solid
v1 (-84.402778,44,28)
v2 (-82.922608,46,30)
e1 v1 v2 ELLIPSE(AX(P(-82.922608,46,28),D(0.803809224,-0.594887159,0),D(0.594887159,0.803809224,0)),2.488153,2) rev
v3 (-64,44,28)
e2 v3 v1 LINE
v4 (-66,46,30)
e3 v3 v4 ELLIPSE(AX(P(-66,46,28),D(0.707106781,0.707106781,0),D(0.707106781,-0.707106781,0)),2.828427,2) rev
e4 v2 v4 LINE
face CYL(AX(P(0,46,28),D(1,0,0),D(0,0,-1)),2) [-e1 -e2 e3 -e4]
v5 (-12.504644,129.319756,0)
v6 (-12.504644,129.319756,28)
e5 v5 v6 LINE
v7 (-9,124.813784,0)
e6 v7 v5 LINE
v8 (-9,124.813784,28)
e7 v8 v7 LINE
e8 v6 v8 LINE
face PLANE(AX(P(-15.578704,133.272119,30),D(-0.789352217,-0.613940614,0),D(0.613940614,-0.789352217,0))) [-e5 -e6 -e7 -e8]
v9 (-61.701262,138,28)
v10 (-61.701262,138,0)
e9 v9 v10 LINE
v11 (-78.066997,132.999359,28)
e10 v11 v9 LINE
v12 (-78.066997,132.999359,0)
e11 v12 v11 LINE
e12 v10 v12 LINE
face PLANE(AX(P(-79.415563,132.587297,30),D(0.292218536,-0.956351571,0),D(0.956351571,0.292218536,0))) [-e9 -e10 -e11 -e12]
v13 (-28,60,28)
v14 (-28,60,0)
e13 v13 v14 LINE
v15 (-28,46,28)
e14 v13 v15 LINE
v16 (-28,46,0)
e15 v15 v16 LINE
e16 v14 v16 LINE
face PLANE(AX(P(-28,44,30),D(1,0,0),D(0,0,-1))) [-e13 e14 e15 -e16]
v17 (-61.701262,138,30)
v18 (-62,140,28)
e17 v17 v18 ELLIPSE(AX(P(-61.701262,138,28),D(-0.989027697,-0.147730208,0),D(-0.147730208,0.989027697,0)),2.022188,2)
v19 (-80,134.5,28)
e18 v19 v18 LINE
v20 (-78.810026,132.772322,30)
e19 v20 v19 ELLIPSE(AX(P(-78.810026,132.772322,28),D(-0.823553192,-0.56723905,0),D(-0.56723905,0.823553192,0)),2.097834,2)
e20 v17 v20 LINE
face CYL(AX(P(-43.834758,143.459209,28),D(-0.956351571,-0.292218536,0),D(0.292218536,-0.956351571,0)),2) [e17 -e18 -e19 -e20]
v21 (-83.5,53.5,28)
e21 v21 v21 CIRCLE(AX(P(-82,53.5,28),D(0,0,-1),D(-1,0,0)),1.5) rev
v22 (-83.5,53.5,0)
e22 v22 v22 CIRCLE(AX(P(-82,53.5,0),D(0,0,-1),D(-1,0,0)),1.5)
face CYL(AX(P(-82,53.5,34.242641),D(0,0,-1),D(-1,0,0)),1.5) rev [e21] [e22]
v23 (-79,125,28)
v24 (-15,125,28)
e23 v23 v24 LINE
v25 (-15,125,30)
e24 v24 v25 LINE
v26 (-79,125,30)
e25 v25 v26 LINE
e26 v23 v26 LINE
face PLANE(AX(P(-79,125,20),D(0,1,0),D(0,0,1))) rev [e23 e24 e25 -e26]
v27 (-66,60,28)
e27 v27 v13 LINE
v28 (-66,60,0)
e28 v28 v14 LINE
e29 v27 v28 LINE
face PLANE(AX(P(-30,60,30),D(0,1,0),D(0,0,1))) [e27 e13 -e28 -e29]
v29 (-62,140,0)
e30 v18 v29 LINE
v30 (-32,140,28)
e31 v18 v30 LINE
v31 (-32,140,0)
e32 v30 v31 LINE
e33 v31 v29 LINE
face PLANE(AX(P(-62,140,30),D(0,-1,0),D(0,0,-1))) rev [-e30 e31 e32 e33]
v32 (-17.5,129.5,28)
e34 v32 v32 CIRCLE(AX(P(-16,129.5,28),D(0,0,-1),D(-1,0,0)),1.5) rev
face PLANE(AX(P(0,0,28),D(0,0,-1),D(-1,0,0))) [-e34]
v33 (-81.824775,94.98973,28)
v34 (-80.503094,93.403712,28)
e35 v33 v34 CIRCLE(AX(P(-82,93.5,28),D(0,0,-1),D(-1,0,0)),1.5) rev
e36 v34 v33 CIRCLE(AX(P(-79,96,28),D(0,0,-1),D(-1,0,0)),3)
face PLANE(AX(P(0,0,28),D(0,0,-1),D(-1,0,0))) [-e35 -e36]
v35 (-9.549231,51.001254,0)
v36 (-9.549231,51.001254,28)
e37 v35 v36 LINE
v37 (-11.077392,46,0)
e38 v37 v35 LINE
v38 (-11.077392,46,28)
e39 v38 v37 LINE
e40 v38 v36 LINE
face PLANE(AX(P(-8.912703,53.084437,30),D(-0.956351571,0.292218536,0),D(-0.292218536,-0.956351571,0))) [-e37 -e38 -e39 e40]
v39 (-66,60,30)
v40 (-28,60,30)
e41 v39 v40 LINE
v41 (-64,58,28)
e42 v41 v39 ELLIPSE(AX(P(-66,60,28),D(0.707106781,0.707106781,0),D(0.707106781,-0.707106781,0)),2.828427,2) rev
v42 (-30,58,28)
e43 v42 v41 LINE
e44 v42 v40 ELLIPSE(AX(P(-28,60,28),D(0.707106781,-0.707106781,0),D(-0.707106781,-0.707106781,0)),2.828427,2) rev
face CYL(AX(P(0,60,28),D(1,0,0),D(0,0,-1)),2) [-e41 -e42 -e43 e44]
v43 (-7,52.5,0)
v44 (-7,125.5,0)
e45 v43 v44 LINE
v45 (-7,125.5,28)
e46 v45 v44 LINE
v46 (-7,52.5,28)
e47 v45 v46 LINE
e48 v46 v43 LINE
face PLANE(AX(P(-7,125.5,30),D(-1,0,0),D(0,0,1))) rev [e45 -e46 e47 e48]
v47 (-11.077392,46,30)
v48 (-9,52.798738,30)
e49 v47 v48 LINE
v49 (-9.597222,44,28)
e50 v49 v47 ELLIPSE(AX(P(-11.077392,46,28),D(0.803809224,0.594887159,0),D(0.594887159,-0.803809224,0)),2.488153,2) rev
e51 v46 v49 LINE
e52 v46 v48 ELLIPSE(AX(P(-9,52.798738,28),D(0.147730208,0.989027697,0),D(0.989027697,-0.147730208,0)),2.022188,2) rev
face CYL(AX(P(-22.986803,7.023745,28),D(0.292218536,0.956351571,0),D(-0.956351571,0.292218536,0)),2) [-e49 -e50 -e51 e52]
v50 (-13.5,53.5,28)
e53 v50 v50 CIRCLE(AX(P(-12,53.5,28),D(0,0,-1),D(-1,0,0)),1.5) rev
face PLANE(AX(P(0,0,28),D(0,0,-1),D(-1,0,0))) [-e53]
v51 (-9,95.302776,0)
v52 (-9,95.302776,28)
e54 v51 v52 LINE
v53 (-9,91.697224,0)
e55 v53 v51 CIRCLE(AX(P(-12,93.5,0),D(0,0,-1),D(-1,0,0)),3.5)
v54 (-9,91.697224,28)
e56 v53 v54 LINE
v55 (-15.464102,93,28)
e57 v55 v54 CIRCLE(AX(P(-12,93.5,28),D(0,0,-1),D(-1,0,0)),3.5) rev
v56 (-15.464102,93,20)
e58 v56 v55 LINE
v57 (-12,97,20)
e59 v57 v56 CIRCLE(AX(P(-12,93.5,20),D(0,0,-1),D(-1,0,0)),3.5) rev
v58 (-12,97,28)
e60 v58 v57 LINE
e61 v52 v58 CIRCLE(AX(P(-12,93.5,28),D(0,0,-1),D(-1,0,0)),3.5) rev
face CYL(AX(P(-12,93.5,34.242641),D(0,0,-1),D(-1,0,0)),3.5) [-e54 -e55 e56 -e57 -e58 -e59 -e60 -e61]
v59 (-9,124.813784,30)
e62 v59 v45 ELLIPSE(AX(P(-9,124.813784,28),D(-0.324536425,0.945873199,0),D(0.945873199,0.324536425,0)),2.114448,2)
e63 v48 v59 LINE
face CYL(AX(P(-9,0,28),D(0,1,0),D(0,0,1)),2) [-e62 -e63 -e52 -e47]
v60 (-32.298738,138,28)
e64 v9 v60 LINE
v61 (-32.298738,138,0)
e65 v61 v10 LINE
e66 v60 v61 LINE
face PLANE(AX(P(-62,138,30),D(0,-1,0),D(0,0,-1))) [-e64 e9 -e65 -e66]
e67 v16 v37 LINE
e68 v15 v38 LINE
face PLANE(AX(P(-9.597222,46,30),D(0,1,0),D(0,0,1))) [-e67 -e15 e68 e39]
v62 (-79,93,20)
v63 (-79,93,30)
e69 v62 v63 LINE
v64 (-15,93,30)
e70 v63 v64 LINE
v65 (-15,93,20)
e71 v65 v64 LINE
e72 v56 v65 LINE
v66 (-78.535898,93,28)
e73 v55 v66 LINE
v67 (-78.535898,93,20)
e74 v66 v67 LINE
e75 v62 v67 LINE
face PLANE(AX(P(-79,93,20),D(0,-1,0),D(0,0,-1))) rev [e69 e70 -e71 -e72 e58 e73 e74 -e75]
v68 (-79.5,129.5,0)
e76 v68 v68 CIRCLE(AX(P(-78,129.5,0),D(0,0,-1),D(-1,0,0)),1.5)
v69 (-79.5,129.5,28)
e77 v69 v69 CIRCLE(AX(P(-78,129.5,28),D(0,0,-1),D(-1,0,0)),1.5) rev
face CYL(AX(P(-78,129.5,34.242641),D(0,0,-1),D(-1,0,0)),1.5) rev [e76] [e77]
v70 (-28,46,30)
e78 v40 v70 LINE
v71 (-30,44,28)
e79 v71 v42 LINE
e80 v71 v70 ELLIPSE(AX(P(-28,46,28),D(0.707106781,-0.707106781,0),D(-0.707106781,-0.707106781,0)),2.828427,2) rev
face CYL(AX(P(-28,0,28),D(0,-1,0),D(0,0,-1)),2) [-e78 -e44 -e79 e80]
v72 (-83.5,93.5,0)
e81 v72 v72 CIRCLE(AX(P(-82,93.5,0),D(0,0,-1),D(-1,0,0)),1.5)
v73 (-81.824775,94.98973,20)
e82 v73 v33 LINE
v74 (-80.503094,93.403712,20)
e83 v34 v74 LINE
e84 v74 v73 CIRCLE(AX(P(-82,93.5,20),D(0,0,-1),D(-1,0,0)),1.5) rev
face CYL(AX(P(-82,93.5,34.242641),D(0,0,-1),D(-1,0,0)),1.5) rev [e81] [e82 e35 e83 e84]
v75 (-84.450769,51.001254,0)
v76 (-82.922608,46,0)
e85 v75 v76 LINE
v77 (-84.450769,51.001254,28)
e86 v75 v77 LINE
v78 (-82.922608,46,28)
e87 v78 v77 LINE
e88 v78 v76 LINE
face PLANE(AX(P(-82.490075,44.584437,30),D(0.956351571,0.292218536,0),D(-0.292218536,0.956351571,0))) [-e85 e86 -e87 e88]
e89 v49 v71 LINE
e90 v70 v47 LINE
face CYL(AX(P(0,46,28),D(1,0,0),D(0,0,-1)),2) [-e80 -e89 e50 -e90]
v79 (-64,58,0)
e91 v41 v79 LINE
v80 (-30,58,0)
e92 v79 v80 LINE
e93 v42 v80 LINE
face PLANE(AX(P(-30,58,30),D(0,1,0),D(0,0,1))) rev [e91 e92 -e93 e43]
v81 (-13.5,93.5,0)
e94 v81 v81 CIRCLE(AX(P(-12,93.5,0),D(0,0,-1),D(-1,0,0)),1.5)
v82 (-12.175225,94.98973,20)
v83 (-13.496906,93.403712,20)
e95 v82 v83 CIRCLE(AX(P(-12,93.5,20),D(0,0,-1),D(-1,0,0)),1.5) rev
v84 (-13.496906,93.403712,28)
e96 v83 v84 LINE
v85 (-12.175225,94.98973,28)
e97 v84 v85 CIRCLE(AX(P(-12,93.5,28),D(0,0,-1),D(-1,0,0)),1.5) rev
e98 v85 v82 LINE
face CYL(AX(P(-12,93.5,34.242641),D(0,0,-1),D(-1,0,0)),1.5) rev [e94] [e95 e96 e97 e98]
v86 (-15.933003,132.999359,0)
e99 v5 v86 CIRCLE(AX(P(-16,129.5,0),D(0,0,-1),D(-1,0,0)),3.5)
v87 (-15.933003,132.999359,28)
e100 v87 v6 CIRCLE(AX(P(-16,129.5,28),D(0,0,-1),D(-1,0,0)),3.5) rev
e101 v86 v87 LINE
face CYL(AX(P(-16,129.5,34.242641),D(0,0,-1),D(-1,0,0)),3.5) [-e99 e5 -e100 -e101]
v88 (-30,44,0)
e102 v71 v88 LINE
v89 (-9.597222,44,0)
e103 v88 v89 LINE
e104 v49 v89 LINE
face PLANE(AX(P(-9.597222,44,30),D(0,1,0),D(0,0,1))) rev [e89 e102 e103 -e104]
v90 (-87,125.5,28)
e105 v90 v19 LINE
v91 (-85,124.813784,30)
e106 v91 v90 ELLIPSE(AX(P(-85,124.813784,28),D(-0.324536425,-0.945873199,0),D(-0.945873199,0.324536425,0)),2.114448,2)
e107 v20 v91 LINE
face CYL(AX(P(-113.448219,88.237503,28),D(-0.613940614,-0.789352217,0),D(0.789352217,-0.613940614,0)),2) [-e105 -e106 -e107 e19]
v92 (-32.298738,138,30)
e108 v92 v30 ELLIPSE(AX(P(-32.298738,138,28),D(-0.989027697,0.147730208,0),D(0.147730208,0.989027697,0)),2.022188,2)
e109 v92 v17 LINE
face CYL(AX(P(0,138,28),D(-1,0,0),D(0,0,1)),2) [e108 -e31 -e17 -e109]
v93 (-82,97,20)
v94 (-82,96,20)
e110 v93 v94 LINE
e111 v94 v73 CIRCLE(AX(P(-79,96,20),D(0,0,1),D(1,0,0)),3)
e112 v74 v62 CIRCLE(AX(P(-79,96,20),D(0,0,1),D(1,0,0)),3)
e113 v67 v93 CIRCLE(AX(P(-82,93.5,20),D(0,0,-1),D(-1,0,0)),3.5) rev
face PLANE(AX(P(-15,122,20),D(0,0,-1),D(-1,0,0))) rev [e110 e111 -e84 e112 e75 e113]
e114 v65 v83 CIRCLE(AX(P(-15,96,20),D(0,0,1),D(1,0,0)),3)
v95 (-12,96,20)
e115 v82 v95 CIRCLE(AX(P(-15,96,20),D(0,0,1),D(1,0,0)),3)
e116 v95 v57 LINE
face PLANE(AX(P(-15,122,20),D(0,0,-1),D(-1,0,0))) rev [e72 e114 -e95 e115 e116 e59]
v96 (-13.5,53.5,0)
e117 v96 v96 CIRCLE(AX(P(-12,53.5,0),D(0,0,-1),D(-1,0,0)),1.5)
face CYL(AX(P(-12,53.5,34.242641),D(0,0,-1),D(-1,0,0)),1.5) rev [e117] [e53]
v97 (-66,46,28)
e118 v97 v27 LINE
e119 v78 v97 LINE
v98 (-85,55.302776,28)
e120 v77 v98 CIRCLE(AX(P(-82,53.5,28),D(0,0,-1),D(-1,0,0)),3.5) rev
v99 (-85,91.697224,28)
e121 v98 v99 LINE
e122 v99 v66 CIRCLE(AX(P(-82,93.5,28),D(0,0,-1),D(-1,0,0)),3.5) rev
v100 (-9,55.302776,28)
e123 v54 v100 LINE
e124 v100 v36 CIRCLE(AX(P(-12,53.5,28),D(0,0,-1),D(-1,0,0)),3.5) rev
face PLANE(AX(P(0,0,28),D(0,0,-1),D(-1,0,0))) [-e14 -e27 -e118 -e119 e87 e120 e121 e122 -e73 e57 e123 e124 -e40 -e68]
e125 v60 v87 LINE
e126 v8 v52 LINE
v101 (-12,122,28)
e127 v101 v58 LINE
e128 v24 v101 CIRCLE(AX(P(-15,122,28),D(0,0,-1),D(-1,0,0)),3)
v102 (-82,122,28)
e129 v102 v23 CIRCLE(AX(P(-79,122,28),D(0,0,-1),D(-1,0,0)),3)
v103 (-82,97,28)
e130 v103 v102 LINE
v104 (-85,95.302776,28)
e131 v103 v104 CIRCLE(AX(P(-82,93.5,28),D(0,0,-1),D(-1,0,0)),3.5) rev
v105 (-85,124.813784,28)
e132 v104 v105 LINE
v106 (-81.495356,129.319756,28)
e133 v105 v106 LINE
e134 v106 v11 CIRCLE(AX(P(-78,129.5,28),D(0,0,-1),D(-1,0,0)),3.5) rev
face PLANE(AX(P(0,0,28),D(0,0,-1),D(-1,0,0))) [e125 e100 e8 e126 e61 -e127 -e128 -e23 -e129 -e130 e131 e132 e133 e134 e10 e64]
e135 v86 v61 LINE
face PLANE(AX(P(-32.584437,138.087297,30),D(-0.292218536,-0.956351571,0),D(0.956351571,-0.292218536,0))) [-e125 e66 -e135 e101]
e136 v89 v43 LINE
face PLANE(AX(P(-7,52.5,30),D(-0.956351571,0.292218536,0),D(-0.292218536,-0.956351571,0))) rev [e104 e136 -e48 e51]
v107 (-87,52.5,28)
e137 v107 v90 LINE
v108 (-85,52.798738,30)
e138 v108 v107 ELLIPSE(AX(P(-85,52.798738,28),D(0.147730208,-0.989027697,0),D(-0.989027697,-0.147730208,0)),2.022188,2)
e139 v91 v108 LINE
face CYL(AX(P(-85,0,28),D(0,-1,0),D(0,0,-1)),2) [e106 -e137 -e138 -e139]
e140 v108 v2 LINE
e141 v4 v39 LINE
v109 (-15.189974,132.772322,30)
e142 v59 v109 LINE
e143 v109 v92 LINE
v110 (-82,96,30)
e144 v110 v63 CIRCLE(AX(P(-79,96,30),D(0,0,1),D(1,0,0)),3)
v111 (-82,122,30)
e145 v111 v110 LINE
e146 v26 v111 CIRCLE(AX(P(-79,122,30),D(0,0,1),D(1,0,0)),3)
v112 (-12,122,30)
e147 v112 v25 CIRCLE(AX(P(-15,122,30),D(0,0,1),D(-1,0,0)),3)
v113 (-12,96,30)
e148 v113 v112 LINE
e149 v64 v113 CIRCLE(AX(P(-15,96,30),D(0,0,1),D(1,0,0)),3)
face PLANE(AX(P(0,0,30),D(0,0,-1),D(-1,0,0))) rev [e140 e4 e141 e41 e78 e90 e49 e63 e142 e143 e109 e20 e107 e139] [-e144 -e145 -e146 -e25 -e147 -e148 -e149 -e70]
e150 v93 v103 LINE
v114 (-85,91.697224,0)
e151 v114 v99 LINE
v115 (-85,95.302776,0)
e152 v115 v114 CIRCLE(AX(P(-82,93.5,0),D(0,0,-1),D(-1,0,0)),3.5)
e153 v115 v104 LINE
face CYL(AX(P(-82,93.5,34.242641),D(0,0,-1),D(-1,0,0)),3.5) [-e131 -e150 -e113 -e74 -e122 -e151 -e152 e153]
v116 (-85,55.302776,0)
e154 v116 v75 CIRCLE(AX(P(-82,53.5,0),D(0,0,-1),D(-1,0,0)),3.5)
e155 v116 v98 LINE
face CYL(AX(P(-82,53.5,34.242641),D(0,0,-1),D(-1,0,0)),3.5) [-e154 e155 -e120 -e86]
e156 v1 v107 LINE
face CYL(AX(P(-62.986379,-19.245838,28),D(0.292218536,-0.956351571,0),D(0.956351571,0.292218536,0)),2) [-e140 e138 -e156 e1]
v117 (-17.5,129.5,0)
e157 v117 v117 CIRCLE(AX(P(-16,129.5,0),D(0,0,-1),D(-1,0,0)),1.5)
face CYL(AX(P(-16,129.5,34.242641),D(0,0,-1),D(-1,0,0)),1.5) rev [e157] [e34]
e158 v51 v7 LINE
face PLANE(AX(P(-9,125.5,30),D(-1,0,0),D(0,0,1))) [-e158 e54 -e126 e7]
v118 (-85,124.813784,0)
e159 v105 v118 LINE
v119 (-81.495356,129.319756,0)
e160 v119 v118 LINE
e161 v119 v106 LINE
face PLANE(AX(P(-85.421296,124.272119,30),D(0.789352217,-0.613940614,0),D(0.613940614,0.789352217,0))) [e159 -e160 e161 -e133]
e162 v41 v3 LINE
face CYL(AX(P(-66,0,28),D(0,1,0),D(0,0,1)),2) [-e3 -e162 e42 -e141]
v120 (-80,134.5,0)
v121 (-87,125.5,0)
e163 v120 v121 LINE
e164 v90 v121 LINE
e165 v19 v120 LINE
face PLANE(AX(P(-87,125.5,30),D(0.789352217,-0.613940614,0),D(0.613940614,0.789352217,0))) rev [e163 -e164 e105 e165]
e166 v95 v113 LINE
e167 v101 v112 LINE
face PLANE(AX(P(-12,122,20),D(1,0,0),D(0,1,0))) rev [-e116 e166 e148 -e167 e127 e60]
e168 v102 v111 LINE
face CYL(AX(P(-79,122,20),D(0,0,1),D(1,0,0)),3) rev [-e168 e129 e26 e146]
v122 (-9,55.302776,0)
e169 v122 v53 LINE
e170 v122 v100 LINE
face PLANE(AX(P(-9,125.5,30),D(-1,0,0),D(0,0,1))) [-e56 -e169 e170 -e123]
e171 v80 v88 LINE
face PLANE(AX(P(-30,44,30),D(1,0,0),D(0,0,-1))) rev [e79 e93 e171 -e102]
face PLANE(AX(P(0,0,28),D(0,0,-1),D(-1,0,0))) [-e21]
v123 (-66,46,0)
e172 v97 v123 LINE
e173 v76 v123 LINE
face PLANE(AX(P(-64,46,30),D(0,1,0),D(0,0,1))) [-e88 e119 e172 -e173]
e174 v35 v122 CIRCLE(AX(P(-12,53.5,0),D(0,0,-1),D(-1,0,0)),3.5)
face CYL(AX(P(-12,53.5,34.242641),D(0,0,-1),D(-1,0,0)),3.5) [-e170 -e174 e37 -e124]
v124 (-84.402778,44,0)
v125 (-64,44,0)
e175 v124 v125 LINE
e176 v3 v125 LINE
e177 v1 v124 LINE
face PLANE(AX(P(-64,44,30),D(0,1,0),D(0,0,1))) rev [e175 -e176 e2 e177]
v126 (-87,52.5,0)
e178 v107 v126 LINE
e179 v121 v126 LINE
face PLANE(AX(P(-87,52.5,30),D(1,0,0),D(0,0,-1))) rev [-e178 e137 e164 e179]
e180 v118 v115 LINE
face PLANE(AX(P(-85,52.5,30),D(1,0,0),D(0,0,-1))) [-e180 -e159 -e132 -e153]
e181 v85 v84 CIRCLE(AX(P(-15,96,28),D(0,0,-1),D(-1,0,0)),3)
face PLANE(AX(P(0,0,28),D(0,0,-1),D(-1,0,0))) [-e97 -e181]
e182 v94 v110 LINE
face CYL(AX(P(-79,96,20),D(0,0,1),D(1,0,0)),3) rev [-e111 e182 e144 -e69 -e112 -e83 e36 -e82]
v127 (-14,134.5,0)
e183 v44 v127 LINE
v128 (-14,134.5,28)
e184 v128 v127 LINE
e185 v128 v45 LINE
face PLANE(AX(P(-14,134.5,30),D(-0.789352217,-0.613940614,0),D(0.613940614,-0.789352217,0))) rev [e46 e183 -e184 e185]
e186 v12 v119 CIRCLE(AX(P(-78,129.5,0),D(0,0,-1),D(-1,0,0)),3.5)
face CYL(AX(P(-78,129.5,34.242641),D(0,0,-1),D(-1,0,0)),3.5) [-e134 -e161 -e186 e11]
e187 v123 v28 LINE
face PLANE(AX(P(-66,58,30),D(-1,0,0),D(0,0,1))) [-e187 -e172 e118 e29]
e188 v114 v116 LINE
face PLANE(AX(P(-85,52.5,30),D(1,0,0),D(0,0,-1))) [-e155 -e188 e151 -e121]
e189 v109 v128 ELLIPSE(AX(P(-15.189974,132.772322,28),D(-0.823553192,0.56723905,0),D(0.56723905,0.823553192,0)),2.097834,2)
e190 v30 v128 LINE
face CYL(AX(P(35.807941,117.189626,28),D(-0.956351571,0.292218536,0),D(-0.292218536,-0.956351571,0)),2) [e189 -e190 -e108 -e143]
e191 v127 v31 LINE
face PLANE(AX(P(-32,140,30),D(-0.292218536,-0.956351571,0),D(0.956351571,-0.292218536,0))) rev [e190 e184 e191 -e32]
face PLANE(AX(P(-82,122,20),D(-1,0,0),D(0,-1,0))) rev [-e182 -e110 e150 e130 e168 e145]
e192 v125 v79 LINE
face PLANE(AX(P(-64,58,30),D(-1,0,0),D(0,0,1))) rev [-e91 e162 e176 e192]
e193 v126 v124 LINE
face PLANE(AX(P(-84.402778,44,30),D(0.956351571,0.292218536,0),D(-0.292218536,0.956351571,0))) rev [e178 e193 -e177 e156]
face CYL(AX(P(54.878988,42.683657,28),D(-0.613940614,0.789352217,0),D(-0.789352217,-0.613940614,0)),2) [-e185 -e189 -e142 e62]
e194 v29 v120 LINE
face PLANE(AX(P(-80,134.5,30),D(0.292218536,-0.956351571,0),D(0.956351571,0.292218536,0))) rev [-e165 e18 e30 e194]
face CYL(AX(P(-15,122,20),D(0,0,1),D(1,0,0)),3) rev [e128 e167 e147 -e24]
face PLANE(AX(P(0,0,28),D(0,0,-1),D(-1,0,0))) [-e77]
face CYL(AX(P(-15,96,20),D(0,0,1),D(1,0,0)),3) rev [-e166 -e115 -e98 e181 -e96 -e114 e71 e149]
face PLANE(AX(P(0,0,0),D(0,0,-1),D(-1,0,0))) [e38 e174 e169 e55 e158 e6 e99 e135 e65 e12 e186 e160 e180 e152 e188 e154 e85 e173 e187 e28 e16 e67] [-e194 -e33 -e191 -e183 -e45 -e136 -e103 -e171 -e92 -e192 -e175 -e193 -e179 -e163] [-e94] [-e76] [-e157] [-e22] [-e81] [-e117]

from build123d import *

# Parameters (mm, degrees)
EXTRUDE_1_DEPTH     = 30
FILLET_4_R          = 2
SKETCH_2_R          = 1.5
CUT_EXTRUDE_1_DEPTH = 28
SHELL_3_DEPTH       = 28
CUT_EXTRUDE_2_DEPTH = 10


# Read off the part's stored shape, not the designer's step: 抽壳3
with BuildPart() as part:
    # 草图1 → 凸台-拉伸1 (new body)
    with BuildSketch(Plane.XY):
        Polygon((-84.402777778, 44), (-87, 52.5), (-87, 125.5), (-80, 134.5), (-62, 140), (-32, 140), (-14, 134.5), (-7, 125.5), (-7, 52.5), (-9.597222222, 44), (-30, 44), (-30, 58), (-64, 58), (-64, 44), align=None)
    extrude(amount=EXTRUDE_1_DEPTH)

    # 圆角4
    fillet_4_edges = [part.edges().sort_by_distance(p)[0] for p in [
        (-47, 58, 30),
        (-30, 51, 30),
        (-19.798611111, 44, 30),
        (-8.298611111, 48.25, 30),
        (-7, 89, 30),
        (-10.5, 130, 30),
        (-23, 137.25, 30),
        (-47, 140, 30),
        (-71, 137.25, 30),
        (-83.5, 130, 30),
        (-74.201388889, 44, 30),
        (-87, 89, 30),
        (-85.701388889, 48.25, 30),
        (-64, 51, 30),
    ]]
    fillet(fillet_4_edges, radius=FILLET_4_R)

    # 草图2 → 切除-拉伸1 (cut)
    with BuildSketch(Plane(origin=(0, 0, 0), x_dir=(-1, 0, 0), z_dir=(0, 0, -1))):
        with Locations((82, 53.5)):
            Circle(SKETCH_2_R)
        with Locations((12, 53.5)):
            Circle(SKETCH_2_R)
        with Locations((12, 93.5)):
            Circle(SKETCH_2_R)
        with Locations((82, 93.5)):
            Circle(SKETCH_2_R)
        with Locations((78, 129.5)):
            Circle(SKETCH_2_R)
        with Locations((16, 129.5)):
            Circle(SKETCH_2_R)
    extrude(amount=-CUT_EXTRUDE_1_DEPTH, mode=Mode.SUBTRACT)

    # 抽壳3 outline → 抽壳3 (cut)
    with BuildSketch(Plane.XY):
        with BuildLine():
            Line((-9, 55.302775638), (-9, 91.697224362))
            ThreePointArc((-9, 91.697224362), (-15.5, 93.5), (-9, 95.302775638))
            Line((-9, 95.302775638), (-9, 124.8137845))
            Line((-9, 124.8137845), (-12.504644228, 129.31975565))
            ThreePointArc((-12.504644228, 129.31975565), (-18.560753547, 127.114095293), (-15.933003152, 132.999358716))
            Line((-15.933003152, 132.999358716), (-32.298738264, 138))
            Line((-32.298738264, 138), (-61.701261736, 138))
            Line((-61.701261736, 138), (-78.066996848, 132.999358716))
            ThreePointArc((-78.066996848, 132.999358716), (-75.439246453, 127.114095293), (-81.495355772, 129.31975565))
            Line((-81.495355772, 129.31975565), (-85, 124.8137845))
            Line((-85, 124.8137845), (-85, 95.302775638))
            ThreePointArc((-85, 95.302775638), (-78.5, 93.5), (-85, 91.697224362))
            Line((-85, 91.697224362), (-85, 55.302775638))
            ThreePointArc((-85, 55.302775638), (-78.528186006, 53.943291769), (-84.450768591, 51.001253651))
            Line((-84.450768591, 51.001253651), (-82.922607753, 46))
            Line((-82.922607753, 46), (-66, 46))
            Line((-66, 46), (-66, 60))
            Line((-66, 60), (-28, 60))
            Line((-28, 60), (-28, 46))
            Line((-28, 46), (-11.077392247, 46))
            Line((-11.077392247, 46), (-9.549231409, 51.001253651))
            ThreePointArc((-9.549231409, 51.001253651), (-15.471813994, 53.943291769), (-9, 55.302775638))
        make_face()
    extrude(amount=SHELL_3_DEPTH, mode=Mode.SUBTRACT)

    # 草图3 → 切除-拉伸2 (cut)
    with BuildSketch(Plane.XY.offset(30)):
        with BuildLine():
            Line((-79, 125), (-15, 125))
            ThreePointArc((-15, 125), (-12.878679656, 124.121320344), (-12, 122))
            Line((-12, 122), (-12, 96))
            ThreePointArc((-12, 96), (-12.878679656, 93.878679656), (-15, 93))
            Line((-15, 93), (-79, 93))
            ThreePointArc((-79, 93), (-81.121320344, 93.878679656), (-82, 96))
            Line((-82, 96), (-82, 122))
            ThreePointArc((-82, 122), (-81.121320344, 124.121320344), (-79, 125))
        make_face()
    extrude(amount=-CUT_EXTRUDE_2_DEPTH, mode=Mode.SUBTRACT)


solid = part.part
